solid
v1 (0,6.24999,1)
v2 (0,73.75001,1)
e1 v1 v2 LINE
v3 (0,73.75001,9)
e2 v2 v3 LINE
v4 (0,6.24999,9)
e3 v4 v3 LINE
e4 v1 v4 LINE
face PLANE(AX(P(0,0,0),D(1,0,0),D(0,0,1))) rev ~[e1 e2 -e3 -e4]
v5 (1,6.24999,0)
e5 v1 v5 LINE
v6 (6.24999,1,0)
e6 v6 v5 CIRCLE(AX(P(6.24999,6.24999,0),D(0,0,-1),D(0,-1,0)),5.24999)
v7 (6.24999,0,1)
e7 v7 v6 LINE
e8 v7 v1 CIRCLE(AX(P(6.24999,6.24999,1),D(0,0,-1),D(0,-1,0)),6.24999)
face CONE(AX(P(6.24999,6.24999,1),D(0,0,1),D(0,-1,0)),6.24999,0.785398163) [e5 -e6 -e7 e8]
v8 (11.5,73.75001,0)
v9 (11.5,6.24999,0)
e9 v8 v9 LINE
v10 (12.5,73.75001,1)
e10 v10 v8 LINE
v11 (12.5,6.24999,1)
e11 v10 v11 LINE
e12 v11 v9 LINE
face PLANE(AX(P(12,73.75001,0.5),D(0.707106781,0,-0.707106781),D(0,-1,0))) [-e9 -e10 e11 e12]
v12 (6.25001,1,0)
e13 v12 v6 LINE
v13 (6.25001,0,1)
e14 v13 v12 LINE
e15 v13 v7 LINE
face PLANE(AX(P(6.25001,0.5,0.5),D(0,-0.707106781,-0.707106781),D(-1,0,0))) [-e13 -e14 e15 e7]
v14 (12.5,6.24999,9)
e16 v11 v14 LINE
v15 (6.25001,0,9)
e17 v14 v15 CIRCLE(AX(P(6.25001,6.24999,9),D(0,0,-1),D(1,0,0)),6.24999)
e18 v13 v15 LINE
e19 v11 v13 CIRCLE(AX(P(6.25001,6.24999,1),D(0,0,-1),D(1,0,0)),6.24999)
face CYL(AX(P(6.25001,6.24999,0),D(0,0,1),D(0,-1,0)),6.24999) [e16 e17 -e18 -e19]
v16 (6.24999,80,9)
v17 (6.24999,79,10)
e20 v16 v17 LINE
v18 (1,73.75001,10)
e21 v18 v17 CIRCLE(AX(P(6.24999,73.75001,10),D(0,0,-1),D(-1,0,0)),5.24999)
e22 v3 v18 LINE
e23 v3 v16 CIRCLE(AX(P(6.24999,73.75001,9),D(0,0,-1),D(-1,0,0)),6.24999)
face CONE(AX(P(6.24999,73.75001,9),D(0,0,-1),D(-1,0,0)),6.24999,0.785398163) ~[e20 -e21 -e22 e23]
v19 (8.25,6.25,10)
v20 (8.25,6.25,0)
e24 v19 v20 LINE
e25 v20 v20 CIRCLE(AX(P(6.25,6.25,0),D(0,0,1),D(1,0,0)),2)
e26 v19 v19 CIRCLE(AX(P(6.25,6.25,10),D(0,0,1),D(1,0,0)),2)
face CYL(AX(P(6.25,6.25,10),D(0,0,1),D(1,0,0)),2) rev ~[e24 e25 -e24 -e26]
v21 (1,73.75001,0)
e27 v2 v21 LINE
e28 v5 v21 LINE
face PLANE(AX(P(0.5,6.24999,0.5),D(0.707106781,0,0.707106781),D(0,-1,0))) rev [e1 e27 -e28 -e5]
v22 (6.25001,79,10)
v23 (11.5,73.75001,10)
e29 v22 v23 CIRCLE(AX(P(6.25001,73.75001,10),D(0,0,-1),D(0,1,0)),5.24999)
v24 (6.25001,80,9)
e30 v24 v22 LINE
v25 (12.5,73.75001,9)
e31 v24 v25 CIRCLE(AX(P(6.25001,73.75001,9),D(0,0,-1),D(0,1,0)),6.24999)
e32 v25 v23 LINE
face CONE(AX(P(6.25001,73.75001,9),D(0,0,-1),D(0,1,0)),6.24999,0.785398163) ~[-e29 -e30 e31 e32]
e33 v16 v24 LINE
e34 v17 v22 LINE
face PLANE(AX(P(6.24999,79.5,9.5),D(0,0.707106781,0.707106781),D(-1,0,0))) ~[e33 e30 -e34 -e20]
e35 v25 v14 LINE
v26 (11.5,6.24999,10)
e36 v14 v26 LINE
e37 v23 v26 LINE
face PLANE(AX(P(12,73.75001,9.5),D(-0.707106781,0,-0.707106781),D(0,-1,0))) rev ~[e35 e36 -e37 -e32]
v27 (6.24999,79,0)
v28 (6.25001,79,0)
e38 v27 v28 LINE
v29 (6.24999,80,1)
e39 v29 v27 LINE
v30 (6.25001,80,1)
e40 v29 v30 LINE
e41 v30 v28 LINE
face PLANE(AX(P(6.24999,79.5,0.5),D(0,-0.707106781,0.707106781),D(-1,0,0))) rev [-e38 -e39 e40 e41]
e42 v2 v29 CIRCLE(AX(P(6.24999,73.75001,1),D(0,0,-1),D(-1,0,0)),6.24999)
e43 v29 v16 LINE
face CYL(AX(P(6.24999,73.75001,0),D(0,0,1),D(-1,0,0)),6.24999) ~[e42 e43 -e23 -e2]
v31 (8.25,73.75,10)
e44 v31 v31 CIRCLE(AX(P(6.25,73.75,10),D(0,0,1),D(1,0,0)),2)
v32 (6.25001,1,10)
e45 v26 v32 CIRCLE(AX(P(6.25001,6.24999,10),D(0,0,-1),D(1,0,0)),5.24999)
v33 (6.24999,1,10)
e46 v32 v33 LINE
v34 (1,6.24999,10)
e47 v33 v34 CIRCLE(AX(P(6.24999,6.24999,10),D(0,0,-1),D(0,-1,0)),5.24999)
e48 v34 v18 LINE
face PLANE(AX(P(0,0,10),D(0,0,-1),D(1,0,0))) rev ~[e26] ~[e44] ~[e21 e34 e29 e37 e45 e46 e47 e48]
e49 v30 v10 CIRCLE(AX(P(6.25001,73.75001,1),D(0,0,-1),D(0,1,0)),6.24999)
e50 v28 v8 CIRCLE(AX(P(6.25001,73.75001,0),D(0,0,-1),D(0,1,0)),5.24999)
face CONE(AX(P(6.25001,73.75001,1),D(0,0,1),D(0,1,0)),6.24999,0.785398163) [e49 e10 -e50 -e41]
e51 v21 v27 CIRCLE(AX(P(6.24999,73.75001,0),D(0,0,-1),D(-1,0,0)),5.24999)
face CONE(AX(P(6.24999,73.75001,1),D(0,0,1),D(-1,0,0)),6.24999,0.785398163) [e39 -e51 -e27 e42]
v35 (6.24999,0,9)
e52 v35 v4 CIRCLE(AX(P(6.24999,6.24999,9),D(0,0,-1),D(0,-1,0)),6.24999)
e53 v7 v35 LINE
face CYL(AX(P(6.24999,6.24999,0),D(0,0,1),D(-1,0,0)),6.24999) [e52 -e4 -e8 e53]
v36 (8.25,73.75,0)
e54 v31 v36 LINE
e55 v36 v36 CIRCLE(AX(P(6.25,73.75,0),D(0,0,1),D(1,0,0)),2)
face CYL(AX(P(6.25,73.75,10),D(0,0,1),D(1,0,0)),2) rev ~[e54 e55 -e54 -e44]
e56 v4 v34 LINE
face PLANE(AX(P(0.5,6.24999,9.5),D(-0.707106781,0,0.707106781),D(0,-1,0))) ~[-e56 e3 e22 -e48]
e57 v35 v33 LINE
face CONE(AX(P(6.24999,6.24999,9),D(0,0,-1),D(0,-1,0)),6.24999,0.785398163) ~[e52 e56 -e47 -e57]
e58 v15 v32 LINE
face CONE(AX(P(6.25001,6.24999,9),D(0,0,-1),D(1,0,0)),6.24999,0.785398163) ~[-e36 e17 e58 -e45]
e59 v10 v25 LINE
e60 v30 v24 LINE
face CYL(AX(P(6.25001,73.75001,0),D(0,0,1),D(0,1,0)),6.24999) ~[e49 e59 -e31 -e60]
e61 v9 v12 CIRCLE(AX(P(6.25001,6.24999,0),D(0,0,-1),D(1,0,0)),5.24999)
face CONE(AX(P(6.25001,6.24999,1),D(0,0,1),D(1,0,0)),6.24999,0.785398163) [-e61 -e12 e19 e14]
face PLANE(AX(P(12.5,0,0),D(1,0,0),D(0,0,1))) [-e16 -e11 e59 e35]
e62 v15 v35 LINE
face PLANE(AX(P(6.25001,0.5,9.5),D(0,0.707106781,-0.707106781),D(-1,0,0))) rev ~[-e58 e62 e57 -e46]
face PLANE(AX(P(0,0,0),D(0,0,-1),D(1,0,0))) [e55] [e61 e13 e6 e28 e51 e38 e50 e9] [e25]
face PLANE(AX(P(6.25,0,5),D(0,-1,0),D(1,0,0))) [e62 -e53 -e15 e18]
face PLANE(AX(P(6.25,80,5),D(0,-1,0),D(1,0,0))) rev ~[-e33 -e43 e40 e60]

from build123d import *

# Parameters (mm, degrees)
F0_W     = 12.5
F0_H     = 10
F1_DEPTH = 80
F2_R     = 2
F3_DEPTH = 10
F4_R     = 6.24999
F5_SIZE  = 1


# Not quite as in the source:
# - a fillet or chamfer is up to 0.001 mm smaller than in the source, because OpenCascade refuses the exact size


with BuildPart() as f1:
    # F0 (on Front) → F1 (new body)
    with BuildSketch(Plane.XZ):
        with Locations((6.25, 5)):
            Rectangle(F0_W, F0_H)
    extrude(amount=-F1_DEPTH)

    # F2 (on face) → F3 (cut, through all)
    with BuildSketch(Plane.XY.offset(10)):
        with Locations((6.25, 73.75)):
            Circle(F2_R)
        with Locations((6.25, 6.25)):
            Circle(F2_R)
    extrude(amount=-F3_DEPTH, mode=Mode.SUBTRACT)

    # F4 (radius 6.25 in the source; OpenCascade refuses exactly that, so slightly less here)
    f4_edges = [f1.edges().sort_by_distance(p)[0] for p in [
        (12.5, 0, 5),
        (0, 0, 5),
        (12.5, 80, 5),
        (0, 80, 5),
    ]]
    fillet(f4_edges, radius=F4_R)

    # F5
    f5_edges = [f1.edges().sort_by_distance(p)[0] for p in [
        (0, 40, 10),
        (0, 6.24999, 5),
        (0, 73.75001, 5),
        (0, 40, 0),
        (10.66942, 1.83058, 0),
        (6.25001, 0, 5),
        (12.5, 6.24999, 5),
        (10.66942, 1.83058, 10),
        (12.5, 40, 0),
        (12.5, 73.75001, 5),
        (12.5, 40, 10),
        (10.66942, 78.16942, 0),
        (6.25001, 80, 5),
        (10.66942, 78.16942, 10),
    ]]
    chamfer(f5_edges, length=F5_SIZE)


solid = f1.part
